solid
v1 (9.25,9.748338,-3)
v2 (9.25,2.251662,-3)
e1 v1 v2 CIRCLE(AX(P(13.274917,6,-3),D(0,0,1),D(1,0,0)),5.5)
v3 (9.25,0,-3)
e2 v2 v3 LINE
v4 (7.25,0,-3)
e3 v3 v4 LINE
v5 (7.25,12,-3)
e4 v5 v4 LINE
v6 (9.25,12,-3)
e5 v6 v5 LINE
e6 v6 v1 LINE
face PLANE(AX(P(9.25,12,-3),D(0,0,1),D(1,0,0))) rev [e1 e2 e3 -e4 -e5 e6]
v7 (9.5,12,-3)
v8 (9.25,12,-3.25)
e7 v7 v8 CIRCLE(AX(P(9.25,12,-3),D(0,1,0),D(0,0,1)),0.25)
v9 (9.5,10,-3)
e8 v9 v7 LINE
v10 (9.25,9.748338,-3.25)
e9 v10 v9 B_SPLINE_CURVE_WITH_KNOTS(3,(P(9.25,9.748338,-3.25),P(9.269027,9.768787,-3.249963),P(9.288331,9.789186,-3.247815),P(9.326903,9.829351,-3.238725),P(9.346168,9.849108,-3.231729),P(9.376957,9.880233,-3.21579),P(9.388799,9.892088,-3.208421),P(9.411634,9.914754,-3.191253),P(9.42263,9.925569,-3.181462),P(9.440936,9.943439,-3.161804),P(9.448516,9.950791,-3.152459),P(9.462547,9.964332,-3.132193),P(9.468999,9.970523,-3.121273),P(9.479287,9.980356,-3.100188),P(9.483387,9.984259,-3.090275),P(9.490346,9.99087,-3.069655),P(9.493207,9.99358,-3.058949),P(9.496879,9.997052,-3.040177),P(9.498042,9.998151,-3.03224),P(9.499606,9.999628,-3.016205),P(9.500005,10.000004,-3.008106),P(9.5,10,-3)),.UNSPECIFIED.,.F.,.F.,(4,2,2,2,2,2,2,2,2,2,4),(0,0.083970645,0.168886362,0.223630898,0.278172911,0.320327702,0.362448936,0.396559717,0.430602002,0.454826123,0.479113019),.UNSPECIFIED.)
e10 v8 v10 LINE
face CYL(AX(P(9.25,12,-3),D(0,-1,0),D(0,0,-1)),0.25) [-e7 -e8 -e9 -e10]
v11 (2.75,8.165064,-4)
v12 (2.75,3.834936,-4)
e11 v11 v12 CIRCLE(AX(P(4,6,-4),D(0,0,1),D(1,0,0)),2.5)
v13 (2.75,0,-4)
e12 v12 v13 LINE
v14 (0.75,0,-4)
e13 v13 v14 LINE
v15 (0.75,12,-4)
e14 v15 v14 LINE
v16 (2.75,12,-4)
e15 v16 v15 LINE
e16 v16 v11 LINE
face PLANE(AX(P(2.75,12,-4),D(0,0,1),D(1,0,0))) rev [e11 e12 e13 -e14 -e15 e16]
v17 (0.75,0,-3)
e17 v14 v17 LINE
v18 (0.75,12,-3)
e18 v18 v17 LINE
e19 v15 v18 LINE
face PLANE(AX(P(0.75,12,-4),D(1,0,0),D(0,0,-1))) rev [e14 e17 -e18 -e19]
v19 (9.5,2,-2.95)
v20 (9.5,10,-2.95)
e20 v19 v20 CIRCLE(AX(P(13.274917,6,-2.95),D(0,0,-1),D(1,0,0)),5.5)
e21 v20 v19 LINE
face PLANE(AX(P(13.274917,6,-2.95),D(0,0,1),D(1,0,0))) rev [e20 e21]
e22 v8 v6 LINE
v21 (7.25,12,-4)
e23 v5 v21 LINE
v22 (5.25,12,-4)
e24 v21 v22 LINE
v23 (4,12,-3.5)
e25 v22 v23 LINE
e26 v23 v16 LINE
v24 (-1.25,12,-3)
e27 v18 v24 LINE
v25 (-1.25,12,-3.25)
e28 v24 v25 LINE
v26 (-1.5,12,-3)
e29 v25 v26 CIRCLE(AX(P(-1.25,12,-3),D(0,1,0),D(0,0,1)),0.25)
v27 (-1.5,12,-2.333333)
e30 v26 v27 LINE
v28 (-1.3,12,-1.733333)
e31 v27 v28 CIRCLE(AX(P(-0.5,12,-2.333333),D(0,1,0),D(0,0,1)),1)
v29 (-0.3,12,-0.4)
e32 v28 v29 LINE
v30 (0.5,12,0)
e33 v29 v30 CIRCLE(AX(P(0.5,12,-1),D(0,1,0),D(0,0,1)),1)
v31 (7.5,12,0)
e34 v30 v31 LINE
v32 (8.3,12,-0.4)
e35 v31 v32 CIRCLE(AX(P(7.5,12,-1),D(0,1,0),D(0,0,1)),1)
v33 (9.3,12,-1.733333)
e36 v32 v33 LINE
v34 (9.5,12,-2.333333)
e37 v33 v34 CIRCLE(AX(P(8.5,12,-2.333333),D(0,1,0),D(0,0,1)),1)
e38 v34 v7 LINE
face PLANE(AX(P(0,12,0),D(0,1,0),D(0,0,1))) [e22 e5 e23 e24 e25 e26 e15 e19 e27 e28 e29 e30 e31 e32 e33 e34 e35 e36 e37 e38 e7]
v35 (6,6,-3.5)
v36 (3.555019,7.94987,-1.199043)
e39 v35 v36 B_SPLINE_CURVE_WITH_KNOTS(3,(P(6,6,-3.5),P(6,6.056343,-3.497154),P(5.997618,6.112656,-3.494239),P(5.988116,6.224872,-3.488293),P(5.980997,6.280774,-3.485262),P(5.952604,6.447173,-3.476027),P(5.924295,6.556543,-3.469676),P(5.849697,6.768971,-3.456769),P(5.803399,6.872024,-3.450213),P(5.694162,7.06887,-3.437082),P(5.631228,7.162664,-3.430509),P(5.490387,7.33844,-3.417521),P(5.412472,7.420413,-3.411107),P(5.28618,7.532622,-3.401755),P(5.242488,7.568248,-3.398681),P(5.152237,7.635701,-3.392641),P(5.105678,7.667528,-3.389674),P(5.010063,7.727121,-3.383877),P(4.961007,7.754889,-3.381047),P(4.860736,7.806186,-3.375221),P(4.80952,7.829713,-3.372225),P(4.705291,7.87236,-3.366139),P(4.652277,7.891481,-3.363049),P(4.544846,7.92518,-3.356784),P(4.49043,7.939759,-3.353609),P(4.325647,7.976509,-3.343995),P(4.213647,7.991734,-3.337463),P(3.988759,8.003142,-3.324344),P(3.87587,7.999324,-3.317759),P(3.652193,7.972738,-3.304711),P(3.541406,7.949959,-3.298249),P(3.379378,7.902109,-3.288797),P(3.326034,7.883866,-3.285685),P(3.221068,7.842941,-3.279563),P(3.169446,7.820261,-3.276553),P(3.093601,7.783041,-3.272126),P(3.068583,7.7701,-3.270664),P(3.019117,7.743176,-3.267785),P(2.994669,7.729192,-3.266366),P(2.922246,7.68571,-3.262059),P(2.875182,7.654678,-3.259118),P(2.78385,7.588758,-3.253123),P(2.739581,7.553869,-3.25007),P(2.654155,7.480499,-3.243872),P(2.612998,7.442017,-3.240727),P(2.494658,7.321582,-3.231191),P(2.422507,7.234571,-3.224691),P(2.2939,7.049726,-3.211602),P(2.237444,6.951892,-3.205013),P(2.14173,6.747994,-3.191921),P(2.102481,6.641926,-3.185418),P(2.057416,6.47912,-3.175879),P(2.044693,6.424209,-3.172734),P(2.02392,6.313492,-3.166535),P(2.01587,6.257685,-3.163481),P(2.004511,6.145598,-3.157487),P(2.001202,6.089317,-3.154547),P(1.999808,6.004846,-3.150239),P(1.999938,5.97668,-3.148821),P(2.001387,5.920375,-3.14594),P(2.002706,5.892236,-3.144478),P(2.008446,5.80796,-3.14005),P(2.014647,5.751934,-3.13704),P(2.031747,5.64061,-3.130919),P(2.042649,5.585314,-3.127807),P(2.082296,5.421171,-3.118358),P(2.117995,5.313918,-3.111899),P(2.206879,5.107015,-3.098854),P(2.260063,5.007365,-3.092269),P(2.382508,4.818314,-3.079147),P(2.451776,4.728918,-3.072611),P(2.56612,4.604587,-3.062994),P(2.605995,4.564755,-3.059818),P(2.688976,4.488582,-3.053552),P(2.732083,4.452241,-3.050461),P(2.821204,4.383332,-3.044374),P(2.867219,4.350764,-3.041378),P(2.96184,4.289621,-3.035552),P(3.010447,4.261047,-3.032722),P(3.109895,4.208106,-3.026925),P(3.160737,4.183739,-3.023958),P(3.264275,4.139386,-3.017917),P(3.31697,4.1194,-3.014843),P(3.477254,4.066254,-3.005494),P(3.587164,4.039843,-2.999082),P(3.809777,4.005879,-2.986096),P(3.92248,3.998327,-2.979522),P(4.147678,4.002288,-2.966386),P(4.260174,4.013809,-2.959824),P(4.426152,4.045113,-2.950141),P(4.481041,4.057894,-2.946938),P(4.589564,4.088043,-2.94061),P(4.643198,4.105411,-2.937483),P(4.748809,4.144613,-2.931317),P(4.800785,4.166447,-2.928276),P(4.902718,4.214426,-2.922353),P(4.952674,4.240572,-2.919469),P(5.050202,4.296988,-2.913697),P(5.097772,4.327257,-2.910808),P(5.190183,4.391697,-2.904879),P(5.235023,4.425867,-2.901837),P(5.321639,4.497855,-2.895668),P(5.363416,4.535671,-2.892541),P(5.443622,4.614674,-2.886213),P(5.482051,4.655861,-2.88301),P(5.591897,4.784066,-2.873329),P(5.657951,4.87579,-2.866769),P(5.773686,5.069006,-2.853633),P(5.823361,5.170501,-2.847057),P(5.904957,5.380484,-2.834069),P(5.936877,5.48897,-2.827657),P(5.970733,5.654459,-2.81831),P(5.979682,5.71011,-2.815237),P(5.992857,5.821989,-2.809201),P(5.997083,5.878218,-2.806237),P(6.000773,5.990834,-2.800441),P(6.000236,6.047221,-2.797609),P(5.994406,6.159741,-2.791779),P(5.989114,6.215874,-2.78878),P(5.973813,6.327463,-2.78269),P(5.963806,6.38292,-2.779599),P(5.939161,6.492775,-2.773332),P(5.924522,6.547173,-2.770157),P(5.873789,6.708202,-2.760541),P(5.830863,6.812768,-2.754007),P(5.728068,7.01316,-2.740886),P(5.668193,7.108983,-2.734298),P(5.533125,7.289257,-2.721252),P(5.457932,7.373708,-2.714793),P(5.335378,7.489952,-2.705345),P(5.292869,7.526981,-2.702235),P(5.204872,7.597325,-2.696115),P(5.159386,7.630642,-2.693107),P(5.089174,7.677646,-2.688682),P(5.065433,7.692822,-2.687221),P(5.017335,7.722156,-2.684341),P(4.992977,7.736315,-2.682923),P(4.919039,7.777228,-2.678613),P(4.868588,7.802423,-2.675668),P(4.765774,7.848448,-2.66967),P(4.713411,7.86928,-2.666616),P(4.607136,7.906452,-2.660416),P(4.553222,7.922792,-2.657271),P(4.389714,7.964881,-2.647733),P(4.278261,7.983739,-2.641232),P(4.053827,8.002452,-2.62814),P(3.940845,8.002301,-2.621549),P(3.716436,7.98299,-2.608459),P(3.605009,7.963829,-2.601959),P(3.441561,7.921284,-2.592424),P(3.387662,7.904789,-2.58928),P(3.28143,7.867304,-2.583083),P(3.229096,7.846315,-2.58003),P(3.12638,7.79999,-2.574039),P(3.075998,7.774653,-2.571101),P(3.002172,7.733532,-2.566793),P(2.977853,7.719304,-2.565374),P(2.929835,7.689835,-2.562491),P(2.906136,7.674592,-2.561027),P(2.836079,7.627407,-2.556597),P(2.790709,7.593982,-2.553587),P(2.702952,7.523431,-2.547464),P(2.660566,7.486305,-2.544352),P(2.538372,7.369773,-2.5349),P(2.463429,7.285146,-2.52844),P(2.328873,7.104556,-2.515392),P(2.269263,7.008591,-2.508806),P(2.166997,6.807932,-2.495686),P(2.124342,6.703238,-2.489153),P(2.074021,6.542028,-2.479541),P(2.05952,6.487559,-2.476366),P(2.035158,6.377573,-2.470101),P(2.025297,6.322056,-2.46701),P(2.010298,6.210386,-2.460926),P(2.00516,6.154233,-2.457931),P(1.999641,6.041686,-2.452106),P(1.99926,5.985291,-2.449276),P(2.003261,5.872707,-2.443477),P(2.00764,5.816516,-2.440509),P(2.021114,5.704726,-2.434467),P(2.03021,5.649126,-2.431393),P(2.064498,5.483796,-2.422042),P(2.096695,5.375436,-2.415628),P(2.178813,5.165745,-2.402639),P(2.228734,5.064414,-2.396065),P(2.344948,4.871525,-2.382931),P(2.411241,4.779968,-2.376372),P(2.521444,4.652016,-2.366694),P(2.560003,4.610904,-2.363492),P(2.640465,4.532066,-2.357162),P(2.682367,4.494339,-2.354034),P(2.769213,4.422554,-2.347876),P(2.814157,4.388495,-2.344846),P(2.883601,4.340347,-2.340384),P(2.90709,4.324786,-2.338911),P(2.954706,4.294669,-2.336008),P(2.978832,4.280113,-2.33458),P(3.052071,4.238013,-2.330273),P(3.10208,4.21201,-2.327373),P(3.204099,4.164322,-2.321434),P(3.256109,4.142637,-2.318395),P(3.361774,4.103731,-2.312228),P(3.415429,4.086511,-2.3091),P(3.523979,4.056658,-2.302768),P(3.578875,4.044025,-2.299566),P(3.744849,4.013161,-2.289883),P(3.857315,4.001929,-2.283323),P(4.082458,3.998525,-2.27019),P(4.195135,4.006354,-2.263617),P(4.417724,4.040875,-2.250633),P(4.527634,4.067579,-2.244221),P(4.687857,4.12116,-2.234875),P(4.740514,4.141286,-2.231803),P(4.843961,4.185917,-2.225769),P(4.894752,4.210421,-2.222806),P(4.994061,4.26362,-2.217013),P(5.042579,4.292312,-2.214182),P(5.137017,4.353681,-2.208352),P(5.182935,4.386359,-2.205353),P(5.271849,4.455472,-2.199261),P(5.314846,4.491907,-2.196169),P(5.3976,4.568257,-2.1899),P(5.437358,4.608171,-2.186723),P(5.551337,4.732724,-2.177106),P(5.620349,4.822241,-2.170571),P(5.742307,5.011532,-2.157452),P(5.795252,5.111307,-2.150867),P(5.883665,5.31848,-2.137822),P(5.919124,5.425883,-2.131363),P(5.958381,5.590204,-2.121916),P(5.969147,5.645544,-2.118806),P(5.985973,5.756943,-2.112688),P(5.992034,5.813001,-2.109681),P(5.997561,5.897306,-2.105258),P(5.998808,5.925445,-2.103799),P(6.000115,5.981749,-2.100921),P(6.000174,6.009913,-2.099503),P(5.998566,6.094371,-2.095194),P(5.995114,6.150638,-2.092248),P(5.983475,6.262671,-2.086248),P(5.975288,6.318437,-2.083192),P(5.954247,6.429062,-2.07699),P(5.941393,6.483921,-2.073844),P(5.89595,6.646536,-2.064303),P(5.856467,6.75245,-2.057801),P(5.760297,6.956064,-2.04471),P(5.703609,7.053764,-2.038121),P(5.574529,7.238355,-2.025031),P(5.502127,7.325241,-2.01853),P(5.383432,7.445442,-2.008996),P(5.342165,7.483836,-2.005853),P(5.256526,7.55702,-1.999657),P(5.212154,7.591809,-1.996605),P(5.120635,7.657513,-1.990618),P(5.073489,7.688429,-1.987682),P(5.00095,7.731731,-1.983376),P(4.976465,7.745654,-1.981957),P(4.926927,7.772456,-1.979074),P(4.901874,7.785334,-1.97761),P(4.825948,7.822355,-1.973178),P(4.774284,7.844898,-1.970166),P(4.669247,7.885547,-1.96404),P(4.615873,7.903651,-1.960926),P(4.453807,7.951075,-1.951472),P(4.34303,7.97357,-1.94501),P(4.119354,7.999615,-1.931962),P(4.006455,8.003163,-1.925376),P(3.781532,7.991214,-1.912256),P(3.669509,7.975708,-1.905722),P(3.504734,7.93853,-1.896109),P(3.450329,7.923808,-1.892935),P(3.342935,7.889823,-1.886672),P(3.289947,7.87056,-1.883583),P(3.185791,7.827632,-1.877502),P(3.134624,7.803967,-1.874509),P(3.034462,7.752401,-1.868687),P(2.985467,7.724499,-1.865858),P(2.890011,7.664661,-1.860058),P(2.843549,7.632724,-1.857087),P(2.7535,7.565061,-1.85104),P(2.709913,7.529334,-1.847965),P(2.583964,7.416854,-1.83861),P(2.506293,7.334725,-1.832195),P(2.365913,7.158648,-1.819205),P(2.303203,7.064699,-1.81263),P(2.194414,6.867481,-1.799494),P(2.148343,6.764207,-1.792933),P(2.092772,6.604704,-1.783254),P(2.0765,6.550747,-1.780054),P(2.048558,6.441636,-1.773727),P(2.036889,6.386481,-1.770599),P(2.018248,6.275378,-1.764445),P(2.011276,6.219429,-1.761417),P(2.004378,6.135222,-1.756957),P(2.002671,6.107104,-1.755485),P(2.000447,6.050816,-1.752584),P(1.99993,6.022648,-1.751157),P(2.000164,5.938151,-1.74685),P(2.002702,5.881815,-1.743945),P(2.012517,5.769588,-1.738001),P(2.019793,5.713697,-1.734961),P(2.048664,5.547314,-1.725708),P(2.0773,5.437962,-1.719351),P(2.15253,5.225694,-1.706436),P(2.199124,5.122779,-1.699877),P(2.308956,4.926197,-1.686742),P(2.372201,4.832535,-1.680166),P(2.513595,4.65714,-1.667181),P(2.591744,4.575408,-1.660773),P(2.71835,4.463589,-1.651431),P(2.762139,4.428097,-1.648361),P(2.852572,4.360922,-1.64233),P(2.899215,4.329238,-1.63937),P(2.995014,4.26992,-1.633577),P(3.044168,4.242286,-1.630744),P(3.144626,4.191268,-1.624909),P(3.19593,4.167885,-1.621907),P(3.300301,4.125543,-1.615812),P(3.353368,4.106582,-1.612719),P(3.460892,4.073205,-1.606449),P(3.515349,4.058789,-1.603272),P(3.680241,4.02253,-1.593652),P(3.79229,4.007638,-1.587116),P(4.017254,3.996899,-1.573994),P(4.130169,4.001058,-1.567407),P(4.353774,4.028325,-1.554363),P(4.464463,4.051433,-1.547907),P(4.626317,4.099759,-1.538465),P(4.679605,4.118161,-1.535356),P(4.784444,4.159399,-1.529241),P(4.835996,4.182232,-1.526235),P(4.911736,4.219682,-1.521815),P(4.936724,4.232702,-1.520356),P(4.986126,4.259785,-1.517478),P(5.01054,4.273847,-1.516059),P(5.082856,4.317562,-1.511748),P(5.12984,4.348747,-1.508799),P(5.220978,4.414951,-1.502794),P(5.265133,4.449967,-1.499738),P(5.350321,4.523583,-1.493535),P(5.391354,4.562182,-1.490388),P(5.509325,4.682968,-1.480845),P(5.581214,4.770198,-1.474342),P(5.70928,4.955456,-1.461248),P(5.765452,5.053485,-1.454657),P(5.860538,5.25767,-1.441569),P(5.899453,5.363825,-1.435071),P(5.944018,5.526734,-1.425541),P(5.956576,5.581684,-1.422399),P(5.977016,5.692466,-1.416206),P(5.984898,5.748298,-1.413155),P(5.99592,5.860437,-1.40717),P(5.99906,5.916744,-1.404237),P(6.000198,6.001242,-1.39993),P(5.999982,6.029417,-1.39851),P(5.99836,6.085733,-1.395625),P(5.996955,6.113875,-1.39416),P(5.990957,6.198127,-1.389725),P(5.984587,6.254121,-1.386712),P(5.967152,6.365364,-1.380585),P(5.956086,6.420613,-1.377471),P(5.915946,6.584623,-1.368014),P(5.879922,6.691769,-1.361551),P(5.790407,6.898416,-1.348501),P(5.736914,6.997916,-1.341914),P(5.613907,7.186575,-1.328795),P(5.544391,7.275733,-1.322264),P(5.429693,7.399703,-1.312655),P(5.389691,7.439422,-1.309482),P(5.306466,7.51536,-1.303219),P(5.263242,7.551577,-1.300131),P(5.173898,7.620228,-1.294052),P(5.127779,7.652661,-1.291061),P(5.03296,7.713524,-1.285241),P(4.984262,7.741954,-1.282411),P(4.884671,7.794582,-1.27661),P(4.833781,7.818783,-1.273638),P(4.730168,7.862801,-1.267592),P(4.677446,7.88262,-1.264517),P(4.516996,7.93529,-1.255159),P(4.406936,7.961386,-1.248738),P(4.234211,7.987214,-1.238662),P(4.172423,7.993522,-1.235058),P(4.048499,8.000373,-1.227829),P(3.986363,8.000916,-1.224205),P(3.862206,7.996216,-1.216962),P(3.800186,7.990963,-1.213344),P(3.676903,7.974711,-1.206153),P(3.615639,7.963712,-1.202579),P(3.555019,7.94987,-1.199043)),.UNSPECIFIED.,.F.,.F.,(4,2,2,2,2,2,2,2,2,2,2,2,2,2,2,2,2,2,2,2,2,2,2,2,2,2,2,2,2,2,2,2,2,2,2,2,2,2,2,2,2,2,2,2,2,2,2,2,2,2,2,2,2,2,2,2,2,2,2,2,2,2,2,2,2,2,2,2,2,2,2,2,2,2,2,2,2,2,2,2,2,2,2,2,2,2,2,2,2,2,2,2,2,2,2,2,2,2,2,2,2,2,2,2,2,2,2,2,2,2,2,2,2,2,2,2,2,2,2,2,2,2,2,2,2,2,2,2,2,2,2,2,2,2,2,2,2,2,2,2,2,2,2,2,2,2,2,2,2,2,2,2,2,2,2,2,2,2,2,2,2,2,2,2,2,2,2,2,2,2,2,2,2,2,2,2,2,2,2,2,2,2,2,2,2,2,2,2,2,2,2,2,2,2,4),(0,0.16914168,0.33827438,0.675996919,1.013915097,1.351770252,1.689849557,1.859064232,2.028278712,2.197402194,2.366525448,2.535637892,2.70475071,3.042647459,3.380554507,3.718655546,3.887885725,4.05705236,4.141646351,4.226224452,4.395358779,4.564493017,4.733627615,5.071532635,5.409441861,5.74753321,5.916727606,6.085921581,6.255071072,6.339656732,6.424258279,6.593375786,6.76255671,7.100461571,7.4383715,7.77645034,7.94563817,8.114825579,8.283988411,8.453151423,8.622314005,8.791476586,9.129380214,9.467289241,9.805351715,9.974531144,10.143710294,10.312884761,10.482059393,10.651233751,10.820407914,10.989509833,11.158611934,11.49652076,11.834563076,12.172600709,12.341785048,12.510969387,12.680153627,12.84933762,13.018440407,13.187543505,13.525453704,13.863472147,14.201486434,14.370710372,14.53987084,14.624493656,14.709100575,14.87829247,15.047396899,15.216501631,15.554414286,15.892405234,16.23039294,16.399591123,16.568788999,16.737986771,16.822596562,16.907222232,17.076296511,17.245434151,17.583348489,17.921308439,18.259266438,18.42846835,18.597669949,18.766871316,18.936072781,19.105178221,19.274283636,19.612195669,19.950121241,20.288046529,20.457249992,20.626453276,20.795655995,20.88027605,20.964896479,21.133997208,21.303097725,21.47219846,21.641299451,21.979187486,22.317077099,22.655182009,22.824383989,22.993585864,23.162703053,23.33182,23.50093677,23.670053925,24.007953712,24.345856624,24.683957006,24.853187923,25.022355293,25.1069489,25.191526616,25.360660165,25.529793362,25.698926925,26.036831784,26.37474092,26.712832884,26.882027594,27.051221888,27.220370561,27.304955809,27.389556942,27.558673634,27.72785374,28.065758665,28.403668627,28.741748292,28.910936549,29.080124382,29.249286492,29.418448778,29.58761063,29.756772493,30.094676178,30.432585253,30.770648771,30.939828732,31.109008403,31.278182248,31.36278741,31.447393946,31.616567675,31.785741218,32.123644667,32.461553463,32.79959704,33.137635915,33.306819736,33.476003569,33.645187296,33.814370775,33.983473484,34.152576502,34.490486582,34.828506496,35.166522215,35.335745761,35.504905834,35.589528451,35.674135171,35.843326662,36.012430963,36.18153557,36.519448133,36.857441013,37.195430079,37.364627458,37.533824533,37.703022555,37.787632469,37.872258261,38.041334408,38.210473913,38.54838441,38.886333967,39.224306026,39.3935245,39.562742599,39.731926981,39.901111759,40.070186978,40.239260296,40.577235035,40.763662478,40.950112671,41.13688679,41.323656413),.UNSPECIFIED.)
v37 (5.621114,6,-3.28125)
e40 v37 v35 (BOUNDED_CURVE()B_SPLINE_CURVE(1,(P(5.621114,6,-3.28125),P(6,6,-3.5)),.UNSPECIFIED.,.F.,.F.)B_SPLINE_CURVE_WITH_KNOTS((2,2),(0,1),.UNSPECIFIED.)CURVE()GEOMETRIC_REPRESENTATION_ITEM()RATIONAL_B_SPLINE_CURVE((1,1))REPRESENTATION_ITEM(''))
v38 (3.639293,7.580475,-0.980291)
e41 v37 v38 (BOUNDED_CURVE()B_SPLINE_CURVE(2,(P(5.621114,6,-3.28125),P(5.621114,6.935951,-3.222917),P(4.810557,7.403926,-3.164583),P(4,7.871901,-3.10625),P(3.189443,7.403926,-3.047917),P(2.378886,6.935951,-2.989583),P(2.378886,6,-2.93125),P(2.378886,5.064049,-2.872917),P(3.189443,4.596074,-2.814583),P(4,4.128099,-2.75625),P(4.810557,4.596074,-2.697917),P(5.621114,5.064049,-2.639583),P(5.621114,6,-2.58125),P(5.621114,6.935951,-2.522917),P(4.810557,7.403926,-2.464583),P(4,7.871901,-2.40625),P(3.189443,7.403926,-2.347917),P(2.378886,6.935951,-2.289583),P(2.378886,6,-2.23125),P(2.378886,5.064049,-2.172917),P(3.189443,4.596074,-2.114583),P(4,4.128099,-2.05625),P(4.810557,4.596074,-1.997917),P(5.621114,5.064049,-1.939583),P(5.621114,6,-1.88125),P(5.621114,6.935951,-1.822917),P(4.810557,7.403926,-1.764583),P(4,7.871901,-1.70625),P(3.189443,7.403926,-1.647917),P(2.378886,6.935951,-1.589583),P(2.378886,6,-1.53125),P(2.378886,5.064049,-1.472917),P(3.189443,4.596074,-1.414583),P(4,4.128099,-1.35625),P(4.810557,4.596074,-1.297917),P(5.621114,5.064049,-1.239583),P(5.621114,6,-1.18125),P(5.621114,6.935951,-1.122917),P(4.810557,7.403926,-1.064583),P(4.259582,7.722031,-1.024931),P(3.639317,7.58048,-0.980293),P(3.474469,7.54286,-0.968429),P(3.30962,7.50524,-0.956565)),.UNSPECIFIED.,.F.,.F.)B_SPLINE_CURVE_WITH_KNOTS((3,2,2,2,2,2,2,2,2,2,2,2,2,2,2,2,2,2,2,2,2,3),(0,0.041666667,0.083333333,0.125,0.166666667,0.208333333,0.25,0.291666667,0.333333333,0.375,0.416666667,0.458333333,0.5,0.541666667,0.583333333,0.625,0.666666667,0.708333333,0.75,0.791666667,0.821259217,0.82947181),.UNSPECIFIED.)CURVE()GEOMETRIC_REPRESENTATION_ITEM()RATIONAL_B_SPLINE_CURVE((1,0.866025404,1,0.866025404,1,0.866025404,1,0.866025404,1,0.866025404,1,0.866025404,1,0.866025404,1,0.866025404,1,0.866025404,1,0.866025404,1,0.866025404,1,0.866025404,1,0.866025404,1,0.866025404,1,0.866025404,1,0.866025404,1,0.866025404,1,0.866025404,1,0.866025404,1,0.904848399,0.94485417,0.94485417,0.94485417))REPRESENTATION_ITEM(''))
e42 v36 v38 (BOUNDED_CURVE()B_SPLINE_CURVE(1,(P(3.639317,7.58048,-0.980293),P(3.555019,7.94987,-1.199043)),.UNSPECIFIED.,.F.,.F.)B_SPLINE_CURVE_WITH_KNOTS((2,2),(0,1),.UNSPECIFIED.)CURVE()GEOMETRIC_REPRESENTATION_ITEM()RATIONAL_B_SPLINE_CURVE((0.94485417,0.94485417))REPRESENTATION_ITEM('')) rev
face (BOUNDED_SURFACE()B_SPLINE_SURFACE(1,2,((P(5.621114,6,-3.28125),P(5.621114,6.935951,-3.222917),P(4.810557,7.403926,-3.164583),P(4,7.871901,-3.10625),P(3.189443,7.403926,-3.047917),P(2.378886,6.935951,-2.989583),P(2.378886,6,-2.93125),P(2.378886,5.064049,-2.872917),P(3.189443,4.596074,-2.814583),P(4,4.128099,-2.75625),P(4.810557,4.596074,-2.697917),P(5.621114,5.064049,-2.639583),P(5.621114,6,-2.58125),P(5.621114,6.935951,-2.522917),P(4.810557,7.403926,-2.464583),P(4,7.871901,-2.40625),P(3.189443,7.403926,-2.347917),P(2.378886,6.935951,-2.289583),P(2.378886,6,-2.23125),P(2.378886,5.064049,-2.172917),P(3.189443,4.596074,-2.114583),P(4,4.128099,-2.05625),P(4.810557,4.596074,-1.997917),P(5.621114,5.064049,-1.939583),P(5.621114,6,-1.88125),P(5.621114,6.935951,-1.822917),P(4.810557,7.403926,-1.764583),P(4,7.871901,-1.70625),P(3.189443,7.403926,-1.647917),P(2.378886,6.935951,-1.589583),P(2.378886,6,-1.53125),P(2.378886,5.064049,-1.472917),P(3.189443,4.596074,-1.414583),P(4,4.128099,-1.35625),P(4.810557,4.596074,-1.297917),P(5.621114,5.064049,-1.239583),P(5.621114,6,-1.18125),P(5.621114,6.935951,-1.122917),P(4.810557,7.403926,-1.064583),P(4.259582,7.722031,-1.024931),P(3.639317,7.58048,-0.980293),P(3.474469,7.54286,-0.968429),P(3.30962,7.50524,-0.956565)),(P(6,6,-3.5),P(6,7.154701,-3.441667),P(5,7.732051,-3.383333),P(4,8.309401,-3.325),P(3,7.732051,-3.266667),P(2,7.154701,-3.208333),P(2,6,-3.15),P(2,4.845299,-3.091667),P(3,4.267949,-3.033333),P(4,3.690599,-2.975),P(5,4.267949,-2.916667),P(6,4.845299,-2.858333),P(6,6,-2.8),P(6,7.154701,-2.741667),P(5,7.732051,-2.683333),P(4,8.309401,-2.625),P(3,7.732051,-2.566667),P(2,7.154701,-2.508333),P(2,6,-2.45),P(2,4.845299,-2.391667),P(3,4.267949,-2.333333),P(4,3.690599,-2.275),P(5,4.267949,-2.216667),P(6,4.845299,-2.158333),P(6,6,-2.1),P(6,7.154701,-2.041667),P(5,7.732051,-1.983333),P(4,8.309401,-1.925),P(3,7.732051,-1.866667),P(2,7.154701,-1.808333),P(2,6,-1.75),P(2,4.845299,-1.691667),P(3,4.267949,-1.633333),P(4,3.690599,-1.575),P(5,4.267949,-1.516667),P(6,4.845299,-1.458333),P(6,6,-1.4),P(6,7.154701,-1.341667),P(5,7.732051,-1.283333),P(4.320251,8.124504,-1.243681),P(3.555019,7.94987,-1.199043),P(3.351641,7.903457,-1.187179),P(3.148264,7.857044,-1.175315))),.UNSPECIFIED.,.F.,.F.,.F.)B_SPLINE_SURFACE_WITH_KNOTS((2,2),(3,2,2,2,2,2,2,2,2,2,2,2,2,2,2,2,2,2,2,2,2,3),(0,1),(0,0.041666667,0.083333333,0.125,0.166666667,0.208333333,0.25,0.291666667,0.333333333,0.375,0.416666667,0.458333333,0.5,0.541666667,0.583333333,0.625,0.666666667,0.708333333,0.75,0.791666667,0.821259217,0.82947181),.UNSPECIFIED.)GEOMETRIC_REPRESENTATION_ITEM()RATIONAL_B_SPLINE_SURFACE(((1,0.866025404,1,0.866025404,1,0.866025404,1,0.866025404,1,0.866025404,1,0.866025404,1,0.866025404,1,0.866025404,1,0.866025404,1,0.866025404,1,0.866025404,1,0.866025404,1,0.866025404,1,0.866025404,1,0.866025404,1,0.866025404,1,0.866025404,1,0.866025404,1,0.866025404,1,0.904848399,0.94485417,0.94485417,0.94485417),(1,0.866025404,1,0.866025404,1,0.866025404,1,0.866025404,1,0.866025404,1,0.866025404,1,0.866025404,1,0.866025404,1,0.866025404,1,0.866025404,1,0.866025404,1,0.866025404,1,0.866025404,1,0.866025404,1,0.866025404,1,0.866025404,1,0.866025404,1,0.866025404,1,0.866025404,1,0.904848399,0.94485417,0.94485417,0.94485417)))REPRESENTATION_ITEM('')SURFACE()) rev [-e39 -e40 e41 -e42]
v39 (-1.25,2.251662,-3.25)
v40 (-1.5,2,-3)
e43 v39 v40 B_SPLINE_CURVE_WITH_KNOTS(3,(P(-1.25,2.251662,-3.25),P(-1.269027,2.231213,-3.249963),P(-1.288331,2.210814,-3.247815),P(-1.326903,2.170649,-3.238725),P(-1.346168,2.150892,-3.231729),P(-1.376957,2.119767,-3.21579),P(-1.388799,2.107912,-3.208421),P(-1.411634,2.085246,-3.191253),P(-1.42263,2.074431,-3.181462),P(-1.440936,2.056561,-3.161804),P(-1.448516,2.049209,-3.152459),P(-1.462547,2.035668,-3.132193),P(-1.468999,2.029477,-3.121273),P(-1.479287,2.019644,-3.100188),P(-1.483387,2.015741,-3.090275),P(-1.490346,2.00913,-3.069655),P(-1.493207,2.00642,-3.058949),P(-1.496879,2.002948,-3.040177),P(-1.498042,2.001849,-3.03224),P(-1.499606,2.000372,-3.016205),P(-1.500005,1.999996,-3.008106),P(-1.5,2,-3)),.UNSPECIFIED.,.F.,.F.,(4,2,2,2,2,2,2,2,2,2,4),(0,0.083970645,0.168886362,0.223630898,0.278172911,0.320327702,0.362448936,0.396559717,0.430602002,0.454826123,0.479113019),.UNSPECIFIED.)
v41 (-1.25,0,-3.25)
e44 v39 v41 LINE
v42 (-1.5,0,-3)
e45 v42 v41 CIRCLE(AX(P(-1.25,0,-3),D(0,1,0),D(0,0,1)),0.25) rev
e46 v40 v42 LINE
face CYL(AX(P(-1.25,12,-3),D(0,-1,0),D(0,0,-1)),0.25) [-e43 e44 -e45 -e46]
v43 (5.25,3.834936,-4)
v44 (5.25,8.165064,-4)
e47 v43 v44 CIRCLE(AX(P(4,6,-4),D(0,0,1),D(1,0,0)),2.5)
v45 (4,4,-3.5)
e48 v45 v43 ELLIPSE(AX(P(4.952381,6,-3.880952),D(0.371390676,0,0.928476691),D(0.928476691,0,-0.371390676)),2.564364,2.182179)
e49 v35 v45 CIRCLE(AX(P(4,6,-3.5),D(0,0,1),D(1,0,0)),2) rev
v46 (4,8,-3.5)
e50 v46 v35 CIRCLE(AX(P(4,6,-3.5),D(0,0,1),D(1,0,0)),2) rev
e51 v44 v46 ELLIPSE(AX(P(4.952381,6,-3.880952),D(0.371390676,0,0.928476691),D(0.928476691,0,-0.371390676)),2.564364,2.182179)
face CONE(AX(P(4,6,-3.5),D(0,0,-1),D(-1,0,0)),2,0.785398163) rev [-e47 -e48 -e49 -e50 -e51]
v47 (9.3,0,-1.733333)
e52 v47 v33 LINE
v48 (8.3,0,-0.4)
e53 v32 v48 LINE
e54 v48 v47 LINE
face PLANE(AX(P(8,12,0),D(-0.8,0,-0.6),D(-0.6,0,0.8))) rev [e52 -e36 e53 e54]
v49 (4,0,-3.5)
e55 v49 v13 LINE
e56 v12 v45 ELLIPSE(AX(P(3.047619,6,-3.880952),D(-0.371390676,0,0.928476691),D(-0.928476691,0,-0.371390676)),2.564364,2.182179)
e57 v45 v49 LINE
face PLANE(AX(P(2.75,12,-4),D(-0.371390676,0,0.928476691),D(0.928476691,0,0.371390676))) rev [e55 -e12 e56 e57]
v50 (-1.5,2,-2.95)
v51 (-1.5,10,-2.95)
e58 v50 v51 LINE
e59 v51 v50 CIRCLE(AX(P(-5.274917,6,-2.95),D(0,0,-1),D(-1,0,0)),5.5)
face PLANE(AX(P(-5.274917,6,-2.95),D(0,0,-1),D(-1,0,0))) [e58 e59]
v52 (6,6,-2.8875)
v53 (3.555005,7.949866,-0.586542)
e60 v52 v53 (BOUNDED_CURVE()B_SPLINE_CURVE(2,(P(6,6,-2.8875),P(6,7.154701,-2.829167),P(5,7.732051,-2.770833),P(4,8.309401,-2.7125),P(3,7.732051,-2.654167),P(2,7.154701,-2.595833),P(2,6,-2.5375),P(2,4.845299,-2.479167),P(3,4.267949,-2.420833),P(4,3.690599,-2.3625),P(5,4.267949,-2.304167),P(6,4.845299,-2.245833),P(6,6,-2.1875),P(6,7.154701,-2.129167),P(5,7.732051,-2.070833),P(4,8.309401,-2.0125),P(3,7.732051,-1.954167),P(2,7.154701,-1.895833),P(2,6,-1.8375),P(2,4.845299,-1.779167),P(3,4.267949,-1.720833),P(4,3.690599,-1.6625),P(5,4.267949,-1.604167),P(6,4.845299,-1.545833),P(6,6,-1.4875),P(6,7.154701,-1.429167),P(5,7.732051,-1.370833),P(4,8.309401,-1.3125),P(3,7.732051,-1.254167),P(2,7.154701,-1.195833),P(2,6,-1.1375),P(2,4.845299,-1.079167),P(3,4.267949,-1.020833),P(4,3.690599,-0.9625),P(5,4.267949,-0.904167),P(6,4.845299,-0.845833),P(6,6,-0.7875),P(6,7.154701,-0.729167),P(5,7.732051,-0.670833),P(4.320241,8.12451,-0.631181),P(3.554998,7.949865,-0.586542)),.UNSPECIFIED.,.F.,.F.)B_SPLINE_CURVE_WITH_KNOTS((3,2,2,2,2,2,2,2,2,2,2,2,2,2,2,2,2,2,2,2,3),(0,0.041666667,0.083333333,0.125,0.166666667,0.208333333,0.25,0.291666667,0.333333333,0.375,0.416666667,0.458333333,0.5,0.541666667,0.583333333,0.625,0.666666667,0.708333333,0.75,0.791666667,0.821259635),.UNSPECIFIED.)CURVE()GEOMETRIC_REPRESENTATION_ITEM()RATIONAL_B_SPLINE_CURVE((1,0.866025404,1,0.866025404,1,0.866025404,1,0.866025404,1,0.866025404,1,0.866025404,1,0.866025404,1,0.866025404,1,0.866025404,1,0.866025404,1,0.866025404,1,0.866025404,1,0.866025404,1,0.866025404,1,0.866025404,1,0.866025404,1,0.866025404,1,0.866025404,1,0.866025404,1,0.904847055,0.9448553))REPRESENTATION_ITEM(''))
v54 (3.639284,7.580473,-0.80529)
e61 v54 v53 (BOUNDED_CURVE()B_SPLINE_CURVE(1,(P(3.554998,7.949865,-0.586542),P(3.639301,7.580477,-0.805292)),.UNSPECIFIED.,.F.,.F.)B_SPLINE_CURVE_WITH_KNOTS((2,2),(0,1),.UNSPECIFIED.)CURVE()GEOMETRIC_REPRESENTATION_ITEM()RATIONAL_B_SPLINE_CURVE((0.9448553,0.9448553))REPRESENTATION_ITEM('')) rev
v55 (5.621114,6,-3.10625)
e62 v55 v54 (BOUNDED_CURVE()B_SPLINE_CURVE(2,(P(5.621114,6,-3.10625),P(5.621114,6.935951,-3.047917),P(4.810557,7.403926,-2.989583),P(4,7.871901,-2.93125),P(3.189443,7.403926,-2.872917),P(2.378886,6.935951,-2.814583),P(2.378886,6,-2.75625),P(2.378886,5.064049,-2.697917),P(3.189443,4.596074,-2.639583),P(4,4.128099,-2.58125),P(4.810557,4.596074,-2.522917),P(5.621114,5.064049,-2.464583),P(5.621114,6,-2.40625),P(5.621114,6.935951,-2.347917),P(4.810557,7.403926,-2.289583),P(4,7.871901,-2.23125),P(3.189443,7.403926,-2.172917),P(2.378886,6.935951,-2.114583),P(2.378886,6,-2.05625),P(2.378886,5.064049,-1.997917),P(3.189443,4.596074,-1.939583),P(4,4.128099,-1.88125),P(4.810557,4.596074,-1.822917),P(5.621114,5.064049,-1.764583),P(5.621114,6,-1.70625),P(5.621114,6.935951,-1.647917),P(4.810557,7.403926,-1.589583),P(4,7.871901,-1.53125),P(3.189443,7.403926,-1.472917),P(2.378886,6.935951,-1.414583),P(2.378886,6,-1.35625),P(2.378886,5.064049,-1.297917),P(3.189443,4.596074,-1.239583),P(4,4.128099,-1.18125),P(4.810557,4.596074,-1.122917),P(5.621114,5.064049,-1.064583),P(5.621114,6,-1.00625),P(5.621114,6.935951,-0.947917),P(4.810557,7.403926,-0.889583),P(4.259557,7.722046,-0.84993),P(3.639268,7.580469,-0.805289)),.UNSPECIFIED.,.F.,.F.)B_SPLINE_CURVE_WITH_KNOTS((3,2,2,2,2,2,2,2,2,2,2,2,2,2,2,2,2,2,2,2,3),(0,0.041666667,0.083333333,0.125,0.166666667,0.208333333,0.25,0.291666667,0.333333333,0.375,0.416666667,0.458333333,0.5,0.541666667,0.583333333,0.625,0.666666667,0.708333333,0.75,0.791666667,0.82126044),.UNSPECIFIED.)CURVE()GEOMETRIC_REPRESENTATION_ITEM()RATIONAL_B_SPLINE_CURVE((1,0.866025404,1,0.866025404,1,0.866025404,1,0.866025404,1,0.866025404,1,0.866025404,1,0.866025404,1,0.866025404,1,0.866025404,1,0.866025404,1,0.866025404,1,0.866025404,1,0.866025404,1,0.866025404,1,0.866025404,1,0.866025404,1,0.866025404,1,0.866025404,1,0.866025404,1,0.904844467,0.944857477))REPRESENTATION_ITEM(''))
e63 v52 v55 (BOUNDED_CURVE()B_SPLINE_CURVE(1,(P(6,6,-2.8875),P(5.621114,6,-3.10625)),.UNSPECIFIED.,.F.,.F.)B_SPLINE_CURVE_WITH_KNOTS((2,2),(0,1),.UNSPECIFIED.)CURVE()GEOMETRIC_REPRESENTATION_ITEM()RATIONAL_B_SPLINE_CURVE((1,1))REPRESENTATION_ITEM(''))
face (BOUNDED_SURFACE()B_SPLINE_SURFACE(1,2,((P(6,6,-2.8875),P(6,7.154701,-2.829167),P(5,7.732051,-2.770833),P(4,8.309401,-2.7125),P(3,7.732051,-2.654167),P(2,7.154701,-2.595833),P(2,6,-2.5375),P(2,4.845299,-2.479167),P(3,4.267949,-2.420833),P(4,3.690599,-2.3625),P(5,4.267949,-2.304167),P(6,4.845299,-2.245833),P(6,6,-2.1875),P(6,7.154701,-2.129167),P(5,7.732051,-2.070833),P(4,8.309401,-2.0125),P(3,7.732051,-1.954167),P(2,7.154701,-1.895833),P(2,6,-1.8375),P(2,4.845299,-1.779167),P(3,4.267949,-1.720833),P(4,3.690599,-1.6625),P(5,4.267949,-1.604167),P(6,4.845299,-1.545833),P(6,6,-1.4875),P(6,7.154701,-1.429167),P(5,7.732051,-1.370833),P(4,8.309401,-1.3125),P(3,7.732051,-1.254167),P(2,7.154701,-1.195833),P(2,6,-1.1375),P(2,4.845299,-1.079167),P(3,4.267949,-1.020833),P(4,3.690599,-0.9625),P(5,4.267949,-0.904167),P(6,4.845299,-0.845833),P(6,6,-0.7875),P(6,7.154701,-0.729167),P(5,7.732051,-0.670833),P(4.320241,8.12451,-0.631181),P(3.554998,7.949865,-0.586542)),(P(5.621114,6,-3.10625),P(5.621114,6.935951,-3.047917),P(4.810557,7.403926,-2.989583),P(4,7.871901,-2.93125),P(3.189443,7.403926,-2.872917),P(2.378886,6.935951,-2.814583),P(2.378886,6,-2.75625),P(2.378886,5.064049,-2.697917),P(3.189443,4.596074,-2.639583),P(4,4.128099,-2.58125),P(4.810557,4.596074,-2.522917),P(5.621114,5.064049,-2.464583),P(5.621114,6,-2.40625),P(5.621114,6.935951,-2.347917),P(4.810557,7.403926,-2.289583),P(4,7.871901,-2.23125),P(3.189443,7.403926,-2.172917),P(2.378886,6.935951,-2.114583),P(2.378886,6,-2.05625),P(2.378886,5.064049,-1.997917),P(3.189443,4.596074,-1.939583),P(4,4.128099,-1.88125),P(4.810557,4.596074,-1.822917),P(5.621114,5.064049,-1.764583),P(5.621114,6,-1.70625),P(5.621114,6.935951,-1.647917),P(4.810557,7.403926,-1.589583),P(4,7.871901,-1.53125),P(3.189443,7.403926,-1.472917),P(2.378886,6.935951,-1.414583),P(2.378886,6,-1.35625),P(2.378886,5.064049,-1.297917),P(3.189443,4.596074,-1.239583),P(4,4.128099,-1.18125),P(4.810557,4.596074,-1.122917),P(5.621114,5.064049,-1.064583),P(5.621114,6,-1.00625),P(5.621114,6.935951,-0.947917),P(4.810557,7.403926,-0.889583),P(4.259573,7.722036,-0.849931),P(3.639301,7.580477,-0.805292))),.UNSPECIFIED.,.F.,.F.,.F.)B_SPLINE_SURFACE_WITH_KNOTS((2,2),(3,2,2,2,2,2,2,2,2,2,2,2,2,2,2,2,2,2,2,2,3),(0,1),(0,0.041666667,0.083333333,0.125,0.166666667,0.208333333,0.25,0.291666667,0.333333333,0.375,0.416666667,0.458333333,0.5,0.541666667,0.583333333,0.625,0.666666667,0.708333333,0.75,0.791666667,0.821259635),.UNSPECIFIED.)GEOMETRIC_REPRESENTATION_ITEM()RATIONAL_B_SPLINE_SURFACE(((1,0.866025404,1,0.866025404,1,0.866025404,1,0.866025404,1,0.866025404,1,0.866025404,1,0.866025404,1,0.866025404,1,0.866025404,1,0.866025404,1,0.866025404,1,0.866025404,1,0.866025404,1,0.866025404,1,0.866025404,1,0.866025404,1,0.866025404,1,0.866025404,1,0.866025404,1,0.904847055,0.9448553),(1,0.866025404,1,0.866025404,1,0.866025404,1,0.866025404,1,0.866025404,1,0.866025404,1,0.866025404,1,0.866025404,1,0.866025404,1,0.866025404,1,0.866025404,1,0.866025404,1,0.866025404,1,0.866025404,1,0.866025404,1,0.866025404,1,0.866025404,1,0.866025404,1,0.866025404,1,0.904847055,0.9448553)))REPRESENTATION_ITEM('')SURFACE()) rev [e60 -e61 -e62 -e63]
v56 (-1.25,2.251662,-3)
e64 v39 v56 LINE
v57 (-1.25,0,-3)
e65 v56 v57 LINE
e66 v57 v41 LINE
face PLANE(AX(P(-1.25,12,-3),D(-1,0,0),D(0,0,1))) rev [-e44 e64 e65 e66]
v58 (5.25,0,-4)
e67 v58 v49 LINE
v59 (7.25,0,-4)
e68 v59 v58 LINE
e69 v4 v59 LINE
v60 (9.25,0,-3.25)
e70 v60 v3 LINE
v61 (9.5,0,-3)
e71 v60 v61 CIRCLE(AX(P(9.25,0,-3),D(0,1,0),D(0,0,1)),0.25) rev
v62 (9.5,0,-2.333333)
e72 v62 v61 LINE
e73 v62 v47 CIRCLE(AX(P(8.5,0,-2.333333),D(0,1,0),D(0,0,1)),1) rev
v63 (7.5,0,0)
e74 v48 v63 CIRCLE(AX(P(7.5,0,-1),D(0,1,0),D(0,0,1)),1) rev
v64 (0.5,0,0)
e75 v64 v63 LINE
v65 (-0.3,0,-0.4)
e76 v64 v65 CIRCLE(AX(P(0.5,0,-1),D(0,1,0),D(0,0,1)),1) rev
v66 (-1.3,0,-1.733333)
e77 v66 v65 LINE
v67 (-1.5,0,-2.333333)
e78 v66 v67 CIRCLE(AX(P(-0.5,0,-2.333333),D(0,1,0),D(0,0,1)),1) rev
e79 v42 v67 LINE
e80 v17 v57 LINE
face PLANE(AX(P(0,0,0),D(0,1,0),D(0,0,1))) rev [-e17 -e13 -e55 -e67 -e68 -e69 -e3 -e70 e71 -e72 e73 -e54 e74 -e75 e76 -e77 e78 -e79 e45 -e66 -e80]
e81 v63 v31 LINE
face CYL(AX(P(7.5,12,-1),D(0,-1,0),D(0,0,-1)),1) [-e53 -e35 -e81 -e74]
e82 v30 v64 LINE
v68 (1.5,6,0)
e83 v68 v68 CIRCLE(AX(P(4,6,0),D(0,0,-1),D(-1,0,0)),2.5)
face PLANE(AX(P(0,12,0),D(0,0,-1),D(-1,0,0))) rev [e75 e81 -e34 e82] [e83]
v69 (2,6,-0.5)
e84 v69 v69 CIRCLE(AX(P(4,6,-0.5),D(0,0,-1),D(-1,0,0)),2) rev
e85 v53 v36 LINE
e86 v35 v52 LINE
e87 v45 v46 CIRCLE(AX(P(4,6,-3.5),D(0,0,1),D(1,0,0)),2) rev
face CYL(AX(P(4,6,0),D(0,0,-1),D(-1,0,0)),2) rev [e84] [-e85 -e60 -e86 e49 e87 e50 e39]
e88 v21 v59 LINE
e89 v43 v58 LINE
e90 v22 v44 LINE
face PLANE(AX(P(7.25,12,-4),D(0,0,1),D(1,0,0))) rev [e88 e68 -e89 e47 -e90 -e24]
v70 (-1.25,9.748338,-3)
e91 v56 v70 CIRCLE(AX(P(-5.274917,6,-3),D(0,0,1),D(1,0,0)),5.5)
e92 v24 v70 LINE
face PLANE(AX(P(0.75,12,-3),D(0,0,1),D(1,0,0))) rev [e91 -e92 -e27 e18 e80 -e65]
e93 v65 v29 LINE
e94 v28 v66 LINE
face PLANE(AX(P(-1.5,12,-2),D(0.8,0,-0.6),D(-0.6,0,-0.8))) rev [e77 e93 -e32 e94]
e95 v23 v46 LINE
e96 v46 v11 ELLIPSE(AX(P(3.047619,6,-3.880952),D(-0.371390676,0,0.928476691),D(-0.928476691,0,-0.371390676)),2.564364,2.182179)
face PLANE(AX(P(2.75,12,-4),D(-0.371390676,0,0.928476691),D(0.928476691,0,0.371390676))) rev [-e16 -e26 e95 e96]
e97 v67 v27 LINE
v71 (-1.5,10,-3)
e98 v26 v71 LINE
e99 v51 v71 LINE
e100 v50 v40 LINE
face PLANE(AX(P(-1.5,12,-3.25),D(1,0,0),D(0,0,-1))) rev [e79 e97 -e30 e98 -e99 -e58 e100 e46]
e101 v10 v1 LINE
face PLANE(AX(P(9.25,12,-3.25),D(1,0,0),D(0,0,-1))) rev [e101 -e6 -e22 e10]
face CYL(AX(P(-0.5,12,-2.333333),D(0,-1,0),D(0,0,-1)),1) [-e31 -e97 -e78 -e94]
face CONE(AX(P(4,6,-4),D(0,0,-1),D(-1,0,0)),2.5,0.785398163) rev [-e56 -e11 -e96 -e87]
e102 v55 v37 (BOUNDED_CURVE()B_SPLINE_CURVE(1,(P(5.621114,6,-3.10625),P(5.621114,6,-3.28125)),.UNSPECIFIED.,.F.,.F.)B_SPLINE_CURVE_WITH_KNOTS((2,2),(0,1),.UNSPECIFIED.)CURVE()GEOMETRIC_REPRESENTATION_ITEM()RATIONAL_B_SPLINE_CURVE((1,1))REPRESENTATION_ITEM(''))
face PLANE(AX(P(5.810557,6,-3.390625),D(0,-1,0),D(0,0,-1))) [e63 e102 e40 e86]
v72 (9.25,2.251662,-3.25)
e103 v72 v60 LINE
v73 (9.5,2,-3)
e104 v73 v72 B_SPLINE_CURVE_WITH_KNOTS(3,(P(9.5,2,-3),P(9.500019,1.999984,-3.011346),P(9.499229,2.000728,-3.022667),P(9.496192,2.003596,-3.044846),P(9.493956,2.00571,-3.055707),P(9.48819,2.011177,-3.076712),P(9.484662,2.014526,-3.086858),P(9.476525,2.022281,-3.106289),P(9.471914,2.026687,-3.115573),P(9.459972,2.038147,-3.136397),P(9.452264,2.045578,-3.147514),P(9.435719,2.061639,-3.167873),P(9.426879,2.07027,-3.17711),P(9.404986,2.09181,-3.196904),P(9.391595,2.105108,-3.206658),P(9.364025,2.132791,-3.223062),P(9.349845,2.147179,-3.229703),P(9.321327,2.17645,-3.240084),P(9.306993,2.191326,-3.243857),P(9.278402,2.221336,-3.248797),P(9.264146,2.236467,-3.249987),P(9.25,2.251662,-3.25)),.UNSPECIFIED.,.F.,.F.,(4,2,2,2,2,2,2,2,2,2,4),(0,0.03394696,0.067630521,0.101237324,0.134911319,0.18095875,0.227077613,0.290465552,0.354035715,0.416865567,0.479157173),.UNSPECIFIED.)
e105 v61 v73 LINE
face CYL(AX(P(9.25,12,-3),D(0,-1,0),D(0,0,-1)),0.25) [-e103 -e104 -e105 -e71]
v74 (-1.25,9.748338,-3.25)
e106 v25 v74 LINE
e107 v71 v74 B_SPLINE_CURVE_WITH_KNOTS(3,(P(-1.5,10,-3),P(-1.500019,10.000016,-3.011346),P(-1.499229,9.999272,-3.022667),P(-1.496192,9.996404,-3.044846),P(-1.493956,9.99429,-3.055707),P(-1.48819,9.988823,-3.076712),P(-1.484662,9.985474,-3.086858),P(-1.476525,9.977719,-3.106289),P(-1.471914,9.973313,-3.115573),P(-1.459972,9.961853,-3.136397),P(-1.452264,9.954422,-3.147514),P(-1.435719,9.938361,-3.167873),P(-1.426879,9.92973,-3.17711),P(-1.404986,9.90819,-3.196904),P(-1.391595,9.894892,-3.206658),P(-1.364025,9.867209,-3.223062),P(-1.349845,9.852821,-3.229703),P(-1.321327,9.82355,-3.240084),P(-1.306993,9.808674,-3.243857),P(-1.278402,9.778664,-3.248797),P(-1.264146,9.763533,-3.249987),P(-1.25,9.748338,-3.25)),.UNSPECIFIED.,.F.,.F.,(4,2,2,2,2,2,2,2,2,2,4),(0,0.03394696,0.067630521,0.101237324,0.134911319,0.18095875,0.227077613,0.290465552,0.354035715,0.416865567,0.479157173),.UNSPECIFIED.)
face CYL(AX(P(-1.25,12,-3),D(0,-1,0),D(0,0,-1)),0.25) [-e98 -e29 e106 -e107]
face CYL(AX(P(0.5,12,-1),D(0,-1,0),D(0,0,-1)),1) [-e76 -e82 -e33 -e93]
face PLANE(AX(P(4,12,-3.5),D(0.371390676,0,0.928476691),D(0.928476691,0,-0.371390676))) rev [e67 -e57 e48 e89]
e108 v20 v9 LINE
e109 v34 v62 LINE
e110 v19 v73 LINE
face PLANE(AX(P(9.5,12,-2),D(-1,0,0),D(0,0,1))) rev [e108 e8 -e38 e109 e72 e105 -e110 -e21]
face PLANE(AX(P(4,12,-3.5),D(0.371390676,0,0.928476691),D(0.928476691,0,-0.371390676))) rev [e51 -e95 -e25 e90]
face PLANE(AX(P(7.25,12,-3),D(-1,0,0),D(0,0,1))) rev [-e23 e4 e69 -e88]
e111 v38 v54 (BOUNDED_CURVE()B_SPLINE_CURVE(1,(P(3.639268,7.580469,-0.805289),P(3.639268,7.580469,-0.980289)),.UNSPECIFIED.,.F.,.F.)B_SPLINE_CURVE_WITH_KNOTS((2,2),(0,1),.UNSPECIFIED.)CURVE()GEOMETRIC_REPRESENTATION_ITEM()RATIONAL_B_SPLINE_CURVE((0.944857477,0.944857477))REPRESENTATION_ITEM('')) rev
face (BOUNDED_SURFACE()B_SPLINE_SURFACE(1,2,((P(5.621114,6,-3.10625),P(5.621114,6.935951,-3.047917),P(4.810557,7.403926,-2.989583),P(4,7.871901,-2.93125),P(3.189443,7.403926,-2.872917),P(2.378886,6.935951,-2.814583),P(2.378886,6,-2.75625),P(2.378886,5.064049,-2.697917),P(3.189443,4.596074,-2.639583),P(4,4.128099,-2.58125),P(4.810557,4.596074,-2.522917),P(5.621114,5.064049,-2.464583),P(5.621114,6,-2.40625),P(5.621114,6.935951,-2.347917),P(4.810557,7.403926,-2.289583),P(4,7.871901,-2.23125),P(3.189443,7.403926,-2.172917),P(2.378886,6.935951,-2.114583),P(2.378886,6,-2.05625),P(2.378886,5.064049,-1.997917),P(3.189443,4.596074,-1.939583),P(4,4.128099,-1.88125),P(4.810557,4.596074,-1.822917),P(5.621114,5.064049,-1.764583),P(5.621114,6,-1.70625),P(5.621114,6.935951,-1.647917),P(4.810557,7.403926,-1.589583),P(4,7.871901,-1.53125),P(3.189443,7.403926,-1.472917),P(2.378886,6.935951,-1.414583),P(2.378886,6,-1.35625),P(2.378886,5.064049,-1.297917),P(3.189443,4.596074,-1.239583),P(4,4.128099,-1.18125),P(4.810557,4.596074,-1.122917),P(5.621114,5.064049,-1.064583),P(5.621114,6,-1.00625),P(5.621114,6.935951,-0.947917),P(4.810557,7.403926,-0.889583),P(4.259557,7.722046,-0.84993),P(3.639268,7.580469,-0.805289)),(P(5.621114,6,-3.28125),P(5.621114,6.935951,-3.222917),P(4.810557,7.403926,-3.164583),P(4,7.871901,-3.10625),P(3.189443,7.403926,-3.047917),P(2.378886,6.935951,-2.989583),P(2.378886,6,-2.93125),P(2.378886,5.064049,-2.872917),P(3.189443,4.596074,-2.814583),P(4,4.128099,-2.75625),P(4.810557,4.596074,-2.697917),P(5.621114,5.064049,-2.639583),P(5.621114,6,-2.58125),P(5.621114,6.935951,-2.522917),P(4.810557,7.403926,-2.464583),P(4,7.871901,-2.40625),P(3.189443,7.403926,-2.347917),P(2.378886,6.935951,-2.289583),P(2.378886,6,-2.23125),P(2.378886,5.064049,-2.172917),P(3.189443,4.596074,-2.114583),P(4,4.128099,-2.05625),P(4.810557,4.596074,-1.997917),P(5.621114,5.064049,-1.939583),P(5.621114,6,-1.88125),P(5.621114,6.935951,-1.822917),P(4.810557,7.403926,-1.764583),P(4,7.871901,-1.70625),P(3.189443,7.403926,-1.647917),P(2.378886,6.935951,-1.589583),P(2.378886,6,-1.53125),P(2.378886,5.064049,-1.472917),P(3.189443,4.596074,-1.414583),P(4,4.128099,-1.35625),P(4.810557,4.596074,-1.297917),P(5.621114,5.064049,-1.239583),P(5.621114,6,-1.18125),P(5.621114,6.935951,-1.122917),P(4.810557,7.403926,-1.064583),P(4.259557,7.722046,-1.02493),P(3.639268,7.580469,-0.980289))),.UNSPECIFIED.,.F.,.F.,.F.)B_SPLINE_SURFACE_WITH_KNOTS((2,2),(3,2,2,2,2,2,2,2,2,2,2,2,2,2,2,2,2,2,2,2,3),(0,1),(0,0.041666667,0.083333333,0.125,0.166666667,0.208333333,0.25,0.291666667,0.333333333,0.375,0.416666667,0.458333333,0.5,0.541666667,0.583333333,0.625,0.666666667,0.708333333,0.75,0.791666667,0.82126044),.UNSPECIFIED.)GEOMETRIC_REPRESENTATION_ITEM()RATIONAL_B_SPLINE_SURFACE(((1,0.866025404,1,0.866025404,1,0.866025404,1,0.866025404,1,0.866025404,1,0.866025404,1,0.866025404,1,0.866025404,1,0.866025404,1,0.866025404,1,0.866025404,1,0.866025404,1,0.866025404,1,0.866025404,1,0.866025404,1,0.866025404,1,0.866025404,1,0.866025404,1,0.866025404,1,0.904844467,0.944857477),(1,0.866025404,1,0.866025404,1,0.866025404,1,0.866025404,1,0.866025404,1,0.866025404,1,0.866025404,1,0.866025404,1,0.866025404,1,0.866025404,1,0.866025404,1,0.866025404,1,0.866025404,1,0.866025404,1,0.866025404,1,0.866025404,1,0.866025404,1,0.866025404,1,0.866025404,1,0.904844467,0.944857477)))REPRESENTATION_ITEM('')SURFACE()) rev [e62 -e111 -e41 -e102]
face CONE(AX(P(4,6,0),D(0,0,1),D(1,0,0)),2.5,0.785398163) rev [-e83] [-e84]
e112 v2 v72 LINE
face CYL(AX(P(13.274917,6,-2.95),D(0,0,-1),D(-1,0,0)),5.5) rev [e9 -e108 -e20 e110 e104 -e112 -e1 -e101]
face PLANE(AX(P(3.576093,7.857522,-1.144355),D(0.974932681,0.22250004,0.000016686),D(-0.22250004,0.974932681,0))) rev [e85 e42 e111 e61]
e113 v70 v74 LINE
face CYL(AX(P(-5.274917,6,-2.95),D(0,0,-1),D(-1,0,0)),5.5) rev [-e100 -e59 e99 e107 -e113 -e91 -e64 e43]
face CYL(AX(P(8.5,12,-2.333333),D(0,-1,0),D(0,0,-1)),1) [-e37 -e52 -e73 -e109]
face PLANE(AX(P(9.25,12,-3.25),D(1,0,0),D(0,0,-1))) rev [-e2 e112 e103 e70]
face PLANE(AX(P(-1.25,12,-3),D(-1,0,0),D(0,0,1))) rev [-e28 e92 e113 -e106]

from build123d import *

# Parameters (mm, degrees)
BOSS_EXTRUDE1_DEPTH = 12
FILLET1_R           = 1
SKETCH4_R           = 2
CUT_EXTRUDE1_DEPTH  = 16.81929202
THREAD1_PITCH       = 0.7
CHAMFER2_SIZE       = 0.5
CHAMFER4_SIZE       = 0.5
CUT_EXTRUDE2_DEPTH  = 0.3
FILLET4_R           = 0.25


with BuildPart() as part:
    # Sketch2 → Boss-Extrude1 (new body)
    with BuildSketch(Plane(origin=(0, 0, 0), x_dir=(1, 0, 0), z_dir=(0, 1, 0))):
        Polygon((0, 0), (8, 0), (9.5, 2), (9.5, 3.25), (9.25, 3.25), (9.25, 3), (7.25, 3), (7.25, 4), (5.25, 4), (4, 3.5), (2.75, 4), (0.75, 4), (0.75, 3), (-1.25, 3), (-1.25, 3.25), (-1.5, 3.25), (-1.5, 2), align=None)
    extrude(amount=BOSS_EXTRUDE1_DEPTH)

    # Fillet1
    fillet1_edges = [part.edges().sort_by_distance(p)[0] for p in [
        (-1.5, 6, -2),
        (9.5, 6, -2),
        (8, 6, 0),
        (0, 6, 0),
    ]]
    fillet(fillet1_edges, radius=FILLET1_R)

    # Sketch4 → Cut-Extrude1 (cut, through all)
    with BuildSketch(Plane(origin=(0, 0, -4), x_dir=(-1, 0, 0), z_dir=(0, 0, -1))):
        with Locations((-4, 6)):
            Circle(SKETCH4_R)
    extrude(amount=-CUT_EXTRUDE1_DEPTH, mode=Mode.SUBTRACT)

    # Thread1: arcs per turn and ends read off the stored shape
    # Thread1: the profile of Thread Profile1 profile screwed along a right-hand helix through 3.285711 turns, 6 arcs to a turn; built about Z, then put on its axis
    thread1_z = Axis((0, 0, 0), (0, 0, 1))
    thread1_corners = [(2.0003, 0, -0.000173205), (2.0003, 0, 0.612673203), (1.621113887, 0, 0.393749999), (1.621113887, 0, 0.218749999)]
    with BuildLine(mode=Mode.PRIVATE) as thread1_profile:
        Line(thread1_corners[0], thread1_corners[1])
        Line(thread1_corners[1], thread1_corners[2])
        Line(thread1_corners[2], thread1_corners[3])
        Line(thread1_corners[3], thread1_corners[0])
    thread1_cap = Face(thread1_profile.wire())
    thread1_turn_angles = [0, 30, 60, 90, 120, 150, 180, 210, 240, 270, 300, 330, 360]
    thread1_turn_weights = [1, 0.8660254037844387, 1, 0.8660254037844387, 1, 0.8660254037844387, 1, 0.8660254037844387, 1, 0.8660254037844387, 1, 0.8660254037844387, 1]
    thread1_turn_rails = [Edge.make_bspline([Vector(p[0], p[1], 0).rotate(thread1_z, thread1_turn_angles[k]) / thread1_turn_weights[k] + Vector(0, 0, p[2] + THREAD1_PITCH * thread1_turn_angles[k] / 360) for k in range(13)], [0, 0, 0, 1, 1, 2, 2, 3, 3, 4, 4, 5, 5, 6, 6, 6], 2, thread1_turn_weights) for p in thread1_corners]
    thread1_turn_sides = [Face.make_surface_from_curves(thread1_turn_rails[p[0]], thread1_turn_rails[p[1]]) for p in [(0, 1), (1, 2), (2, 3), (3, 0)]]
    thread1_last_angles = [1080, 1110, 1140, 1161.428, 1182.856]
    thread1_last_weights = [1, 0.8660254037844387, 1, 0.9308773922572046, 1]
    thread1_last_rails = [Edge.make_bspline([Vector(p[0], p[1], 0).rotate(thread1_z, thread1_last_angles[k]) / thread1_last_weights[k] + Vector(0, 0, p[2] + THREAD1_PITCH * thread1_last_angles[k] / 360) for k in range(5)], [0, 0, 0, 1, 1, 2, 2, 2], 2, thread1_last_weights) for p in thread1_corners]
    thread1_last_sides = [Face.make_surface_from_curves(thread1_last_rails[p[0]], thread1_last_rails[p[1]]) for p in [(0, 1), (1, 2), (2, 3), (3, 0)]]
    thread1 = Plane(origin=(4, 6, -3.5), x_dir=(1, 0, 0), z_dir=(0, 0, 1)) * Solid(Shell([*[p.moved(Location((0, 0, THREAD1_PITCH * i))) for i in range(3) for p in thread1_turn_sides], *thread1_last_sides, thread1_cap, thread1_cap.rotate(thread1_z, 1182.856).moved(Location((0, 0, THREAD1_PITCH * 1182.856 / 360)))]))
    add(thread1)

    # Chamfer2
    # the kernel refuses this chamfer: 0.5 mm, written as the material it takes off along each edge
    with BuildSketch(Plane(origin=(4, 6, -4), x_dir=(-0.4063033524336664, 0.9137382479688392, 0), z_dir=(-0.9137382479688392, -0.4063033524336664, 0))) as chamfer2_piece_1:
        Polygon((2 + CHAMFER2_SIZE, 0), (2, -CHAMFER2_SIZE), (2, 0), align=None)
    revolve(axis=Axis((4, 6, -4), (0, 0, -1)), revolution_arc=227.945655457, mode=Mode.SUBTRACT)
    with BuildSketch(Plane(origin=(4, 6, -4), x_dir=(-1, 0, 0), z_dir=(0, -1, 0))) as chamfer2_piece_2:
        Polygon((2 + CHAMFER2_SIZE, 0), (2, -CHAMFER2_SIZE), (2, 0), align=None)
    revolve(axis=Axis((4, 6, -4), (0, 0, -1)), revolution_arc=113.948286938, mode=Mode.SUBTRACT)
    with BuildSketch(Plane(origin=(4, 6, -4), x_dir=(0.4059119450129516, -0.9139121910204517, 0), z_dir=(0.9139121910204517, 0.4059119450129516, 0))) as chamfer2_piece_3:
        Polygon((2 + CHAMFER2_SIZE, 0), (2, -CHAMFER2_SIZE), (2, 0), align=None)
    revolve(axis=Axis((4, 6, -4), (0, 0, -1)), revolution_arc=113.948286938, mode=Mode.SUBTRACT)

    # Chamfer4
    chamfer4_edges = [part.edges().sort_by_distance(p)[0] for p in [
        (6, 6, 0),
    ]]
    chamfer(chamfer4_edges, length=CHAMFER4_SIZE)

    # Sketch8 → Cut-Extrude2 (cut)
    with BuildSketch(Plane(origin=(0, 0, -3.25), x_dir=(-1, 0, 0), z_dir=(0, 0, -1))):
        with BuildLine():
            Line((-9.5, 10), (-9.5, 2))
            ThreePointArc((-9.5, 2), (-7.774917218, 6), (-9.5, 10))
        make_face()
        with BuildLine():
            Line((1.5, 10), (1.5, 2))
            ThreePointArc((1.5, 2), (-0.225082782, 6), (1.5, 10))
        make_face()
    extrude(amount=-CUT_EXTRUDE2_DEPTH, mode=Mode.SUBTRACT)

    # Fillet4
    fillet4_edges = [part.edges().sort_by_distance(p)[0] for p in [
        (-1.5, 11, -3.25),
        (-1.5, 1, -3.25),
        (9.5, 11, -3.25),
        (9.5, 1, -3.25),
    ]]
    fillet(fillet4_edges, radius=FILLET4_R - 0.0001)  # a hair under: the kernel refuses the full size


solid = part.part
